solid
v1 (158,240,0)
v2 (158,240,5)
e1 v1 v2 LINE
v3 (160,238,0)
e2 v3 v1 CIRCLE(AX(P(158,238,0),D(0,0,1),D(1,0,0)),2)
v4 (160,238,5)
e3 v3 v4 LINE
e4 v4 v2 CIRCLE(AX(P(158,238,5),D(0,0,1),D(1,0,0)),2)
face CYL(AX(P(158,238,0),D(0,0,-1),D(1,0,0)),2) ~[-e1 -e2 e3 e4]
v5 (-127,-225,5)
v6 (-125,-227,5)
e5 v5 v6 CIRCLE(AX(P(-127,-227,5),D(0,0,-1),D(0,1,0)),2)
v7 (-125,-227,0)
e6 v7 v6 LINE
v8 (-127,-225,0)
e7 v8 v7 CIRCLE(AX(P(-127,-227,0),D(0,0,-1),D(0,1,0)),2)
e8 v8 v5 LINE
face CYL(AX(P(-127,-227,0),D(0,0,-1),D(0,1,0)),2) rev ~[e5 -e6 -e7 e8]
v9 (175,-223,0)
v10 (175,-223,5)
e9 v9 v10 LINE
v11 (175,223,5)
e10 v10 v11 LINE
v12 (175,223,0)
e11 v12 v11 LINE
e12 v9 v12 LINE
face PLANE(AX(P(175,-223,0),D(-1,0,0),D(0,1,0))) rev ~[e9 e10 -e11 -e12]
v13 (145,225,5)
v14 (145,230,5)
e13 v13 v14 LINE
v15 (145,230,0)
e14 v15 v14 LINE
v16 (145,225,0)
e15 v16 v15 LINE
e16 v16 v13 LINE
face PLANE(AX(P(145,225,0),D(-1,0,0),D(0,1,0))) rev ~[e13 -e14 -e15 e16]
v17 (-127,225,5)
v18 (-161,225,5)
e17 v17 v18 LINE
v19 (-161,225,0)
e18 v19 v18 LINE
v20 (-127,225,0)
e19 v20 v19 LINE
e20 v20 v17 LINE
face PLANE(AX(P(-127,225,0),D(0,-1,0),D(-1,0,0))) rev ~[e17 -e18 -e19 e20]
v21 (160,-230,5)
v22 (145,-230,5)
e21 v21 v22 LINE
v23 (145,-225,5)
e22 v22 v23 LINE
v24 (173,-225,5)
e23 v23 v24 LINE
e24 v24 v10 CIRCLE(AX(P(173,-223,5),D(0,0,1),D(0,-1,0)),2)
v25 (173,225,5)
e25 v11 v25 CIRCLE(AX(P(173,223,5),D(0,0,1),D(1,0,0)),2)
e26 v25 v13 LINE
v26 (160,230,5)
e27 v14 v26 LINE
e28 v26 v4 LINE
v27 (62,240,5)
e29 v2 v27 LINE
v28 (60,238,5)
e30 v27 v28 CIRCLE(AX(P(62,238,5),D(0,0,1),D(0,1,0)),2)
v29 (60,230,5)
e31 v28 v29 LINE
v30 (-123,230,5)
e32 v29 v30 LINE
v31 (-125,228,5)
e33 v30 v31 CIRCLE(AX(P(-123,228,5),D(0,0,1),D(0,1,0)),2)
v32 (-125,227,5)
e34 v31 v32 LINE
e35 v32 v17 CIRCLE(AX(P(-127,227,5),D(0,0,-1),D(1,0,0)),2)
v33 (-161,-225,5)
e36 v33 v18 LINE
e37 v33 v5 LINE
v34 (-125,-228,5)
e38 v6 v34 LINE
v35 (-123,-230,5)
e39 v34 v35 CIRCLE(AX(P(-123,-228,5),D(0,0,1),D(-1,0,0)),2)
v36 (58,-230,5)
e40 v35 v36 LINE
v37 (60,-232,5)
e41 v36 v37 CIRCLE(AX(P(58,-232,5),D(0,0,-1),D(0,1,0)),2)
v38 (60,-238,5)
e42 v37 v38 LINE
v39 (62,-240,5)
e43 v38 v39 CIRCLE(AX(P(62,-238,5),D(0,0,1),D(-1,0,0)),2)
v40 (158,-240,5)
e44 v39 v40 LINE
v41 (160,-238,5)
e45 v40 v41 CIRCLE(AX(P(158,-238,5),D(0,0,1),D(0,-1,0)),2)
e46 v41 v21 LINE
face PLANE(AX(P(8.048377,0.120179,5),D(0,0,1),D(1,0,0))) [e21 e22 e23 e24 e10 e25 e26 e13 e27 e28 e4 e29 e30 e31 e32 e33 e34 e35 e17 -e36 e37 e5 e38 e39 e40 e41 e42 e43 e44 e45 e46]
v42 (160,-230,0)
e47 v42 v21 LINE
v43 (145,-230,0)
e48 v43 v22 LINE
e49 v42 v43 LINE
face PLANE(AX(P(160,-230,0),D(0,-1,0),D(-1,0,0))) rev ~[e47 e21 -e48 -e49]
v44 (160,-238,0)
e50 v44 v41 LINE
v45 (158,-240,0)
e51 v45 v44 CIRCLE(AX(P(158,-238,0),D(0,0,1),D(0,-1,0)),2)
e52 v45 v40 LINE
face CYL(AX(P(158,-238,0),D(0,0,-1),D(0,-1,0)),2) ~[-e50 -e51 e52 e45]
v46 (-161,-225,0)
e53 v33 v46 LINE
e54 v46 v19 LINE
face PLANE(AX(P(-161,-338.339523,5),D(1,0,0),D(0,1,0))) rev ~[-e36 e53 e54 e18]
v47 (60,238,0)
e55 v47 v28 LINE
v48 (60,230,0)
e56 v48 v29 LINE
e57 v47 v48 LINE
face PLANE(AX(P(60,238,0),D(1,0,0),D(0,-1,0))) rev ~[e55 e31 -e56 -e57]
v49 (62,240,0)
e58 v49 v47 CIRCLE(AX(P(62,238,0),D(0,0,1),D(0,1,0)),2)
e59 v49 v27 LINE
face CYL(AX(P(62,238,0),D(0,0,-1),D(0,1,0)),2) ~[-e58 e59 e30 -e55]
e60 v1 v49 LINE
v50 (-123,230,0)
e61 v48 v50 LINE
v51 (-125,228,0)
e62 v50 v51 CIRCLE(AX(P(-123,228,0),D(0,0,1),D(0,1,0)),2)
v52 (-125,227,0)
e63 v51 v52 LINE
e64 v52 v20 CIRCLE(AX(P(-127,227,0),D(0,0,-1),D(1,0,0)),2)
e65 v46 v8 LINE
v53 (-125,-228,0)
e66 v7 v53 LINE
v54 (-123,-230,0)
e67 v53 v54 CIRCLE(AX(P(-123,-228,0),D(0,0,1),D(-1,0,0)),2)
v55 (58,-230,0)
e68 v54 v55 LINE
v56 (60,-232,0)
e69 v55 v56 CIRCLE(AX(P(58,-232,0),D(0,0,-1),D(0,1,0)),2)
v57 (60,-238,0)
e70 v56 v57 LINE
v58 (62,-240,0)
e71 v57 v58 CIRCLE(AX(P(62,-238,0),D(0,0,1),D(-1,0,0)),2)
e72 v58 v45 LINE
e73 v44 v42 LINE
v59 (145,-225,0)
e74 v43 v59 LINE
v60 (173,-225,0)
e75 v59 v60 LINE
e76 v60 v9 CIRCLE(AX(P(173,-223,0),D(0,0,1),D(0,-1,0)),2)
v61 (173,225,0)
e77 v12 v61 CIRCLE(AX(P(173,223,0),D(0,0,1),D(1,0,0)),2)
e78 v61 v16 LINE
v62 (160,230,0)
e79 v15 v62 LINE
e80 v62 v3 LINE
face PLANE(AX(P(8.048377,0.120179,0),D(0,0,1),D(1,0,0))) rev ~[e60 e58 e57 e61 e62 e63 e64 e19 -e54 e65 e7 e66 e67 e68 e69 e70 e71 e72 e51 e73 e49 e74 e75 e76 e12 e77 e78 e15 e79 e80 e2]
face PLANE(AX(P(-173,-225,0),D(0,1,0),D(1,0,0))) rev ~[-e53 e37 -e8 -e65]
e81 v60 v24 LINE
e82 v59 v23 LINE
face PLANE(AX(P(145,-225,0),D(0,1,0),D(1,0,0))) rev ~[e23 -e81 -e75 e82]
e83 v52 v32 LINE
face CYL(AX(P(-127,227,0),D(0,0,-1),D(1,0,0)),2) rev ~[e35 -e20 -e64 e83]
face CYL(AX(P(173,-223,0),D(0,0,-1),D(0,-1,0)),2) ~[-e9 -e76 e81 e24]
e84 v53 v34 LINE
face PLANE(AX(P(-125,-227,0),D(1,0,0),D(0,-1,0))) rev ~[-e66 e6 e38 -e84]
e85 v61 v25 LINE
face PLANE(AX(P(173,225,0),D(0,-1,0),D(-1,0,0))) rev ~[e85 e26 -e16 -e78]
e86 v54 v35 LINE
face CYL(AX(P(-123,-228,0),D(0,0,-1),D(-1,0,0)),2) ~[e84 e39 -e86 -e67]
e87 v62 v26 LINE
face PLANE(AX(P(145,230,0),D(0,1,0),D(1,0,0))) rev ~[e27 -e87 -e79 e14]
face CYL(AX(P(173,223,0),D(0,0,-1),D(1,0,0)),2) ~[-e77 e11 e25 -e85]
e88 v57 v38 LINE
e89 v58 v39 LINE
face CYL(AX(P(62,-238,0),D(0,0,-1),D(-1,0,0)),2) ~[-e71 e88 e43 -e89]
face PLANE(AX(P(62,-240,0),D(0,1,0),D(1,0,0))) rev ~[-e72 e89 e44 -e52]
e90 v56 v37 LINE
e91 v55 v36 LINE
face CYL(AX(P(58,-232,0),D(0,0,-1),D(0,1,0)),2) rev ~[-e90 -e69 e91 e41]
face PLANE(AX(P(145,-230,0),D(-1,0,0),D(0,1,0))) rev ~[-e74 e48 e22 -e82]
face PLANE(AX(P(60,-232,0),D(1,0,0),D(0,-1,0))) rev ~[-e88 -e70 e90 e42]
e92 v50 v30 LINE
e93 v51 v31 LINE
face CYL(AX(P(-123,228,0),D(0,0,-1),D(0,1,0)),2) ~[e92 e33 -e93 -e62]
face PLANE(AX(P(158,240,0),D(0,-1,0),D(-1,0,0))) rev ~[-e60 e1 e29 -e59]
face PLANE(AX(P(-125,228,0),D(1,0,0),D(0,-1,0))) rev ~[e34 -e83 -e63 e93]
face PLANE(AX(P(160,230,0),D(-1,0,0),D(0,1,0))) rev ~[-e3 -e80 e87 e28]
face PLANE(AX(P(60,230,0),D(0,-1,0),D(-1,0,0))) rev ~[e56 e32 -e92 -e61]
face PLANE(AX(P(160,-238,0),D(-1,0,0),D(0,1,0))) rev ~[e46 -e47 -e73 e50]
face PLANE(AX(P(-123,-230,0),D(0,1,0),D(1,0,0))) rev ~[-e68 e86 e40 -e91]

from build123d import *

# Parameters (mm, degrees)
F1_DEPTH = 5
F3_DEPTH = 25


with BuildPart() as f1:
    # F0 (on Top) → F1 (new body)
    with BuildSketch(Plane.XY):
        with BuildLine():
            Line((145, -225), (173, -225))
            ThreePointArc((173, -225), (174.4142135624, -224.4142135624), (175, -223))
            Line((175, -223), (175, 223))
            ThreePointArc((175, 223), (174.4142135624, 224.4142135624), (173, 225))
            Line((173, 225), (145, 225))
            Line((145, 225), (145, 230))
            Line((145, 230), (160, 230))
            Line((160, 230), (160, 238))
            ThreePointArc((160, 238), (159.4142135624, 239.4142135624), (158, 240))
            Line((158, 240), (62, 240))
            ThreePointArc((62, 240), (60.5857864376, 239.4142135624), (60, 238))
            Line((60, 238), (60, 230))
            Line((60, 230), (-123, 230))
            ThreePointArc((-123, 230), (-124.4142135624, 229.4142135624), (-125, 228))
            Line((-125, 228), (-125, 227))
            ThreePointArc((-125, 227), (-125.5857864376, 225.5857864376), (-127, 225))
            Line((-127, 225), (-173, 225))
            ThreePointArc((-173, 225), (-174.4142135624, 224.4142135624), (-175, 223))
            Line((-175, 223), (-175, -223))
            ThreePointArc((-175, -223), (-174.4142135624, -224.4142135624), (-173, -225))
            Line((-173, -225), (-127, -225))
            ThreePointArc((-127, -225), (-125.5857864376, -225.5857864376), (-125, -227))
            Line((-125, -227), (-125, -228))
            ThreePointArc((-125, -228), (-124.4142135624, -229.4142135624), (-123, -230))
            Line((-123, -230), (58, -230))
            ThreePointArc((58, -230), (59.4142135624, -230.5857864376), (60, -232))
            Line((60, -232), (60, -238))
            ThreePointArc((60, -238), (60.5857864376, -239.4142135624), (62, -240))
            Line((62, -240), (158, -240))
            ThreePointArc((158, -240), (159.4142135624, -239.4142135624), (160, -238))
            Line((160, -238), (160, -230))
            Line((160, -230), (145, -230))
            Line((145, -230), (145, -225))
        make_face()
    extrude(amount=F1_DEPTH)

    # F2 (on face) → F3 (cut)
    with BuildSketch(Plane.XY.offset(5)):
        with BuildLine():
            Line((-161, 225), (-161, 340.5782580579))
            Line((-161, 340.5782580579), (-227.952612991, 340.5782580579))
            Line((-227.952612991, 340.5782580579), (-227.952612991, -338.3395225013))
            Line((-227.952612991, -338.3395225013), (-161, -338.3395225013))
            Line((-161, -338.3395225013), (-161, -225))
            Line((-161, -225), (-173, -225))
            ThreePointArc((-173, -225), (-174.4142135624, -224.4142135624), (-175, -223))
            Line((-175, -223), (-175, 223))
            ThreePointArc((-175, 223), (-174.4142135624, 224.4142135624), (-173, 225))
            Line((-173, 225), (-161, 225))
        make_face()
        with BuildLine():
            Line((-161, -225), (-161, 225))
            Line((-161, 225), (-173, 225))
            ThreePointArc((-173, 225), (-174.4142135624, 224.4142135624), (-175, 223))
            Line((-175, 223), (-175, -223))
            ThreePointArc((-175, -223), (-174.4142135624, -224.4142135624), (-173, -225))
            Line((-173, -225), (-161, -225))
        make_face()
    extrude(amount=-F3_DEPTH, mode=Mode.SUBTRACT)


solid = f1.part
